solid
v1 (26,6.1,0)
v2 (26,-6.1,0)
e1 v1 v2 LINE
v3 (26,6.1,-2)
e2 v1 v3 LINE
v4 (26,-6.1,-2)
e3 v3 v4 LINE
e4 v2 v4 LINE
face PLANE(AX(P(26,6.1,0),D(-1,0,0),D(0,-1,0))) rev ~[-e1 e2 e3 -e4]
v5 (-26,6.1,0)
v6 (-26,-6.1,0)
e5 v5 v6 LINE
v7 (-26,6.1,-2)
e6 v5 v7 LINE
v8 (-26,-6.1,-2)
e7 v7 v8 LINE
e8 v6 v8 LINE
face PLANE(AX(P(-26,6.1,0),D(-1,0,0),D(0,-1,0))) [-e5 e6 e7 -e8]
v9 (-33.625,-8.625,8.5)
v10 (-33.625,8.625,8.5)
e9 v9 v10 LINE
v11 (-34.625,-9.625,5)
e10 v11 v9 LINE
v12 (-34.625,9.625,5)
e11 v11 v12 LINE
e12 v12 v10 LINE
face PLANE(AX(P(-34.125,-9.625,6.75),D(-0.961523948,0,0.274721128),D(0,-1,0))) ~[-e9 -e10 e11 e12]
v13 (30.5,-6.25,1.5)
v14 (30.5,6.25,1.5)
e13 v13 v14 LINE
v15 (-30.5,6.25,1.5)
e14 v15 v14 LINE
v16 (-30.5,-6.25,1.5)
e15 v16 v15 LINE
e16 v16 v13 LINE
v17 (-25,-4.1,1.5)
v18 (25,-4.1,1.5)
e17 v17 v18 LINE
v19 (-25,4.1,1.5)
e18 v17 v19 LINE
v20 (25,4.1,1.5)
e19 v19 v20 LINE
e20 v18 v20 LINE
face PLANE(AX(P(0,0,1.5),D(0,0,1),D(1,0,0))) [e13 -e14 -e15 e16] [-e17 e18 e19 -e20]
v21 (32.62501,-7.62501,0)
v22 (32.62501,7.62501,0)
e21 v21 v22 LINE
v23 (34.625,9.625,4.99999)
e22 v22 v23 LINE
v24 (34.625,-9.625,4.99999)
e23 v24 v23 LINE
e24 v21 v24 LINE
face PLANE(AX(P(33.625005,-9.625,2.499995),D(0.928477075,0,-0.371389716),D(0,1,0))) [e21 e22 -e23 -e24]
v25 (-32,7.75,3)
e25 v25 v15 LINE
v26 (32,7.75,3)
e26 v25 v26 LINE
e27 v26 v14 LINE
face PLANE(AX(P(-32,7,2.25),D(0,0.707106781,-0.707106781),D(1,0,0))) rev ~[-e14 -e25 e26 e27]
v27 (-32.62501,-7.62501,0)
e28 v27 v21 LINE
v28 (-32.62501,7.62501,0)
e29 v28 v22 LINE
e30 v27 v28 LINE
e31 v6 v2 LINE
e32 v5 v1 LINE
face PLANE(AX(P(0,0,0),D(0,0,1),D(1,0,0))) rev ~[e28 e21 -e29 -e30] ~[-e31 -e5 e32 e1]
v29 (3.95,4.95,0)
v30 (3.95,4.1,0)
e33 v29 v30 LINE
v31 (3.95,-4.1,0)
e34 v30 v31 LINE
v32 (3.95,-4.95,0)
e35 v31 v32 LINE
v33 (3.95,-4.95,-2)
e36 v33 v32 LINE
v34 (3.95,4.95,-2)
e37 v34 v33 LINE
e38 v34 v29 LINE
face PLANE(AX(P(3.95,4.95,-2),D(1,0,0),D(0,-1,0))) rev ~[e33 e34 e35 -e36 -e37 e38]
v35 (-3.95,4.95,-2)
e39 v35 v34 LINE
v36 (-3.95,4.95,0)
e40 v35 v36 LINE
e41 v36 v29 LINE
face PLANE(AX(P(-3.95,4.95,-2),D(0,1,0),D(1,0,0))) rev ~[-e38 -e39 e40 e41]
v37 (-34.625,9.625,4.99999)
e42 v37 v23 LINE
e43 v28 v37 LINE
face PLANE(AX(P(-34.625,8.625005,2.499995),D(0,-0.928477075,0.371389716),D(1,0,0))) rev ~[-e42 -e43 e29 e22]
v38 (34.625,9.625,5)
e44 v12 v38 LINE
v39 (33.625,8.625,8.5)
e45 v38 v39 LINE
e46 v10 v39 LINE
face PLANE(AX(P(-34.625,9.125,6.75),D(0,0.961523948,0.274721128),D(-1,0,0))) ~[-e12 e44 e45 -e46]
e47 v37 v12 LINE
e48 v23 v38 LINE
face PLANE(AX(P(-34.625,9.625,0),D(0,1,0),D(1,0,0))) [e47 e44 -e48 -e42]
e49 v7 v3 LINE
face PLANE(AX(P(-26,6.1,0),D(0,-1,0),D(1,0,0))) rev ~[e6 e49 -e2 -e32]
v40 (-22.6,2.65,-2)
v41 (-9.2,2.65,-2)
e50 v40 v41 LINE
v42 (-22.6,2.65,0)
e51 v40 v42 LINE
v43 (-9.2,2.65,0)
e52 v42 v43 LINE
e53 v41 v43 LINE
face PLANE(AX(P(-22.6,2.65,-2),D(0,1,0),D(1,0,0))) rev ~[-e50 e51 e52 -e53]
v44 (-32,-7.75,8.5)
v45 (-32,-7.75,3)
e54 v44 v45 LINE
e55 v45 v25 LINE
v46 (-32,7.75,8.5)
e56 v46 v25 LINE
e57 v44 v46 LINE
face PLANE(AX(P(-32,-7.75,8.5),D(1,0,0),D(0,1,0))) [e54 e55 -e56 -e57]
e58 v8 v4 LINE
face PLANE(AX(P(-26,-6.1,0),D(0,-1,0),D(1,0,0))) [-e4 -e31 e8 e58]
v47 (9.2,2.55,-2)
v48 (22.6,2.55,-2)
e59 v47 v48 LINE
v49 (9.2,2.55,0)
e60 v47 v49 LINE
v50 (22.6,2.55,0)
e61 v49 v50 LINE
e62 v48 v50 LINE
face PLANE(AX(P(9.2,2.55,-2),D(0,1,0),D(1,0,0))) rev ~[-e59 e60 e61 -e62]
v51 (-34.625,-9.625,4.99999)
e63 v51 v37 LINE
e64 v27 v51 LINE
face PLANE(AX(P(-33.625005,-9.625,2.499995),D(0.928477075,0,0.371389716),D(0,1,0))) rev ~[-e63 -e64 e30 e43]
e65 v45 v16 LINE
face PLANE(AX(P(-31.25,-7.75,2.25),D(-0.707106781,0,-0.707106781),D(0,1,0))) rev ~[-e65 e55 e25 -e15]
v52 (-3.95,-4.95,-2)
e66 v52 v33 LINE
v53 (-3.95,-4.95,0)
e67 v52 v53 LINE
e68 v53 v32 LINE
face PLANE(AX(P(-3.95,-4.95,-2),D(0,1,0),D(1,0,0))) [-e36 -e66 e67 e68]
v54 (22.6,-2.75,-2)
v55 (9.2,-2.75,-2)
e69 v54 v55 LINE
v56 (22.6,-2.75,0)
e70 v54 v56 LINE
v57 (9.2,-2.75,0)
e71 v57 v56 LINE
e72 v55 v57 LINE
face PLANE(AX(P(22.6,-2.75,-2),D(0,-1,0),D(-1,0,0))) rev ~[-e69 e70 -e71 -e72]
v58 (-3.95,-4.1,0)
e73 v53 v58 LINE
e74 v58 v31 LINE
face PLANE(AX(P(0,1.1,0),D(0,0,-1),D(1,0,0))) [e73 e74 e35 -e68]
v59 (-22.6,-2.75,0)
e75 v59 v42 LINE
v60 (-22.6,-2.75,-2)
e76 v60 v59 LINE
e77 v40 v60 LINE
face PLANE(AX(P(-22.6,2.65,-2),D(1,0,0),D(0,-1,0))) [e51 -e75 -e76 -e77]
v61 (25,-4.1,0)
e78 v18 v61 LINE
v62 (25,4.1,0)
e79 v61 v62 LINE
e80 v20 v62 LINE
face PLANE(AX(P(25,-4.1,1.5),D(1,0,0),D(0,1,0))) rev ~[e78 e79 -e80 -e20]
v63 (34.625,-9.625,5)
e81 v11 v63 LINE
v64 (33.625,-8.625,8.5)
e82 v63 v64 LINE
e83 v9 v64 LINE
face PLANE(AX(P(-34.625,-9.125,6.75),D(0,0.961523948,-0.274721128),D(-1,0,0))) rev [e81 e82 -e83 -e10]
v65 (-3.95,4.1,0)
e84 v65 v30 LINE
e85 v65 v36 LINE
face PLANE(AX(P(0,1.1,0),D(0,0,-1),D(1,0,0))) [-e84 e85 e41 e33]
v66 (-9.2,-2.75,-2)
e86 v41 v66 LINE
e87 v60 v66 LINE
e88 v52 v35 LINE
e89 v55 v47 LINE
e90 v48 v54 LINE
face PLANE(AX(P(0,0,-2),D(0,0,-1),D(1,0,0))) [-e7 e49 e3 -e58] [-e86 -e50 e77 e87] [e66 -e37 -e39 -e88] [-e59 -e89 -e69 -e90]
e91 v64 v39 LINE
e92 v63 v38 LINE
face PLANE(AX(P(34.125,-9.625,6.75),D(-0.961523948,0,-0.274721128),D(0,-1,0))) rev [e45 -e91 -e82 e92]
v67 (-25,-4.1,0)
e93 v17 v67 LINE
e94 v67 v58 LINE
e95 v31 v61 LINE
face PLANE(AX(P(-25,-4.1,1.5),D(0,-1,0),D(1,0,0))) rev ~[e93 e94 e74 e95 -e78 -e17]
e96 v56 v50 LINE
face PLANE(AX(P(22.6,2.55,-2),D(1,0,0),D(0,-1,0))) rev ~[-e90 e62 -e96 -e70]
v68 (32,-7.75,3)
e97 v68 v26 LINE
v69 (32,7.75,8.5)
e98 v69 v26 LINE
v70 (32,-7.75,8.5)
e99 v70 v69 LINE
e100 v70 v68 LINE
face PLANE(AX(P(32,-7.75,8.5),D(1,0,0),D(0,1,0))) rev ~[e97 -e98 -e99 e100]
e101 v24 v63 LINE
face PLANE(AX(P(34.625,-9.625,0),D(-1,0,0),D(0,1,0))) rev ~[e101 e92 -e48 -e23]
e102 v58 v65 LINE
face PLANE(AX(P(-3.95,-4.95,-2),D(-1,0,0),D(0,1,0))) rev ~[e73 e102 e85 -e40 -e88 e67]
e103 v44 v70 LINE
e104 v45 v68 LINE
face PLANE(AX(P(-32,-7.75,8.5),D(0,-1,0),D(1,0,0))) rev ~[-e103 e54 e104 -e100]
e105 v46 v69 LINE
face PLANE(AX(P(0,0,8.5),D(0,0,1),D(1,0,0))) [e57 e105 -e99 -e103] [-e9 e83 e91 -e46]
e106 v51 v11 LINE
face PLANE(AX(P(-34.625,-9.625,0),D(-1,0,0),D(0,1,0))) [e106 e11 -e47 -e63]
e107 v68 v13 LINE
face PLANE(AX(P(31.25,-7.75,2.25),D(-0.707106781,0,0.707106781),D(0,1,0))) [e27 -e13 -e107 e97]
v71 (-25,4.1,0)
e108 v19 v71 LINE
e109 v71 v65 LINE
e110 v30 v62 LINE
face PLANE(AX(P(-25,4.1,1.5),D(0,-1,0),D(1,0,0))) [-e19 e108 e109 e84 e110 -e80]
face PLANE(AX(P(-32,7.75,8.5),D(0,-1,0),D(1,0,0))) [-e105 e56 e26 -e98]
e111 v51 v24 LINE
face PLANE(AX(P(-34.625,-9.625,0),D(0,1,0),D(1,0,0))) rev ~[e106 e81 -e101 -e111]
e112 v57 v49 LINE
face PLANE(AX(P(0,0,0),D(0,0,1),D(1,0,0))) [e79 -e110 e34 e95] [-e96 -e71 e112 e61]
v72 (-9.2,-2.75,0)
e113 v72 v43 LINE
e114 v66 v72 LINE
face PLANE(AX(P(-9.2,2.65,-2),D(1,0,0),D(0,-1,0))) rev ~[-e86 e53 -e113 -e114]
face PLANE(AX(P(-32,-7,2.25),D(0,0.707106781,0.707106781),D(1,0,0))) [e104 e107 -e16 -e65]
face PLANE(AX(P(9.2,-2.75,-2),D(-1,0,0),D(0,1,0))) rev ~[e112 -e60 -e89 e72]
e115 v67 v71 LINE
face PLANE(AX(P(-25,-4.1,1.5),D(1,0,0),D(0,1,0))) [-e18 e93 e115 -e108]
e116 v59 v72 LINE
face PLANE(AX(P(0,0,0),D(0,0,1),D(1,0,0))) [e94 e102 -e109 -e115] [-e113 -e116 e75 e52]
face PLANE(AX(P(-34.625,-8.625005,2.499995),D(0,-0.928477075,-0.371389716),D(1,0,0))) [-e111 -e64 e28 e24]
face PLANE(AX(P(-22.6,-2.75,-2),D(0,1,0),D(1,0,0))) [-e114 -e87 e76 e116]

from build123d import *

# Parameters (mm, degrees)
F0_W      = 69.25
F0_H      = 19.25
F1_DEPTH  = 8.5
F3_SIZE2  = 1
F3_SIZE   = 3.5
F4_SIZE2  = 4.99999
F4_SIZE   = 1.99999
F2_W      = 64
F2_H      = 15.5
F5_DEPTH  = 7
F6_W      = 52
F6_H      = 12.2
F7_DEPTH  = 2
F8_W      = 7.9
F8_H      = 7.7
F8_H_2    = 2.2
F9_DEPTH  = 2
F8_W_2    = 13.4
F8_H_3    = 5.4
F10_DEPTH = 25
F11_W     = 50
F11_H     = 8.2
F11_W_2   = 13.4
F11_H_2   = 5.4
F11_H_3   = 5.3
F12_DEPTH = 1.5
F13_SIZE  = 1.5


# Not quite as in the source:
# - a fillet or chamfer is up to 0.001 mm smaller than in the source, because OpenCascade refuses the exact size


with BuildPart() as f1:
    # F0 (on Top) → F1 (new body)
    with BuildSketch(Plane.XY):
        Rectangle(F0_W, F0_H)
    extrude(amount=F1_DEPTH)

    # F3
    f3_edges = [f1.edges().sort_by_distance(p)[0] for p in [
        (-34.625, 0, 8.5),
        (0, -9.625, 8.5),
        (34.625, 0, 8.5),
        (0, 9.625, 8.5),
    ]]
    chamfer(f3_edges, length=F3_SIZE, length2=F3_SIZE2)

    # F4 (size 2 and 5 in the source; OpenCascade refuses exactly that, so slightly less here)
    f4_edges = [f1.edges().sort_by_distance(p)[0] for p in [
        (-34.625, 0, 0),
        (0, -9.625, 0),
        (0, 9.625, 0),
        (34.625, 0, 0),
    ]]
    f4_side = f1.faces().sort_by_distance((0, 0, 0))[0]
    chamfer(f4_edges, length=F4_SIZE, length2=F4_SIZE2, reference=f4_side)

    # F2 (on face) → F5 (cut)
    with BuildSketch(Plane.XY.offset(8.5)):
        Rectangle(F2_W, F2_H)
    extrude(amount=-F5_DEPTH, mode=Mode.SUBTRACT)

    # F6 (on face) → F7 (join)
    with BuildSketch(Plane(origin=(0, 0, 0), x_dir=(1, 0, 0), z_dir=(0, 0, -1))):
        Rectangle(F6_W, F6_H)
    extrude(amount=F7_DEPTH)

    # F8 (on face) → F9 (cut)
    with BuildSketch(Plane(origin=(0, 0, -2), x_dir=(1, 0, 0), z_dir=(0, 0, -1))):
        with Locations((0, -1.1)):
            Rectangle(F8_W, F8_H)
        with Locations((0, 3.85)):
            Rectangle(F8_W, F8_H_2)
    extrude(amount=-F9_DEPTH, mode=Mode.SUBTRACT)

    # F8 (on face) → F10 (cut)
    with BuildSketch(Plane(origin=(0, 0, -2), x_dir=(1, 0, 0), z_dir=(0, 0, -1))):
        with Locations((-15.9, 0.05)):
            Rectangle(F8_W_2, F8_H_3)
        Polygon((15.7195143402, 2.75), (9.2, 2.75), (9.2, -2.55), (22.6, -2.55), (22.6, 2.75), align=None)
    extrude(amount=-F10_DEPTH, mode=Mode.SUBTRACT)

    # F11 (on face) → F12 (cut)
    with BuildSketch(Plane.XY.offset(1.5)):
        Rectangle(F11_W, F11_H)
        with Locations((-15.9, -0.05)):
            Rectangle(F11_W_2, F11_H_2, mode=Mode.SUBTRACT)
        with Locations((15.9, -0.1)):
            Rectangle(F11_W_2, F11_H_3, mode=Mode.SUBTRACT)
    extrude(amount=-F12_DEPTH, mode=Mode.SUBTRACT)

    # F13
    f13_edges = [f1.edges().sort_by_distance(p)[0] for p in [
        (-32, 0, 1.5),
        (0, 7.75, 1.5),
        (32, 0, 1.5),
        (0, -7.75, 1.5),
    ]]
    chamfer(f13_edges, length=F13_SIZE)


solid = f1.part
